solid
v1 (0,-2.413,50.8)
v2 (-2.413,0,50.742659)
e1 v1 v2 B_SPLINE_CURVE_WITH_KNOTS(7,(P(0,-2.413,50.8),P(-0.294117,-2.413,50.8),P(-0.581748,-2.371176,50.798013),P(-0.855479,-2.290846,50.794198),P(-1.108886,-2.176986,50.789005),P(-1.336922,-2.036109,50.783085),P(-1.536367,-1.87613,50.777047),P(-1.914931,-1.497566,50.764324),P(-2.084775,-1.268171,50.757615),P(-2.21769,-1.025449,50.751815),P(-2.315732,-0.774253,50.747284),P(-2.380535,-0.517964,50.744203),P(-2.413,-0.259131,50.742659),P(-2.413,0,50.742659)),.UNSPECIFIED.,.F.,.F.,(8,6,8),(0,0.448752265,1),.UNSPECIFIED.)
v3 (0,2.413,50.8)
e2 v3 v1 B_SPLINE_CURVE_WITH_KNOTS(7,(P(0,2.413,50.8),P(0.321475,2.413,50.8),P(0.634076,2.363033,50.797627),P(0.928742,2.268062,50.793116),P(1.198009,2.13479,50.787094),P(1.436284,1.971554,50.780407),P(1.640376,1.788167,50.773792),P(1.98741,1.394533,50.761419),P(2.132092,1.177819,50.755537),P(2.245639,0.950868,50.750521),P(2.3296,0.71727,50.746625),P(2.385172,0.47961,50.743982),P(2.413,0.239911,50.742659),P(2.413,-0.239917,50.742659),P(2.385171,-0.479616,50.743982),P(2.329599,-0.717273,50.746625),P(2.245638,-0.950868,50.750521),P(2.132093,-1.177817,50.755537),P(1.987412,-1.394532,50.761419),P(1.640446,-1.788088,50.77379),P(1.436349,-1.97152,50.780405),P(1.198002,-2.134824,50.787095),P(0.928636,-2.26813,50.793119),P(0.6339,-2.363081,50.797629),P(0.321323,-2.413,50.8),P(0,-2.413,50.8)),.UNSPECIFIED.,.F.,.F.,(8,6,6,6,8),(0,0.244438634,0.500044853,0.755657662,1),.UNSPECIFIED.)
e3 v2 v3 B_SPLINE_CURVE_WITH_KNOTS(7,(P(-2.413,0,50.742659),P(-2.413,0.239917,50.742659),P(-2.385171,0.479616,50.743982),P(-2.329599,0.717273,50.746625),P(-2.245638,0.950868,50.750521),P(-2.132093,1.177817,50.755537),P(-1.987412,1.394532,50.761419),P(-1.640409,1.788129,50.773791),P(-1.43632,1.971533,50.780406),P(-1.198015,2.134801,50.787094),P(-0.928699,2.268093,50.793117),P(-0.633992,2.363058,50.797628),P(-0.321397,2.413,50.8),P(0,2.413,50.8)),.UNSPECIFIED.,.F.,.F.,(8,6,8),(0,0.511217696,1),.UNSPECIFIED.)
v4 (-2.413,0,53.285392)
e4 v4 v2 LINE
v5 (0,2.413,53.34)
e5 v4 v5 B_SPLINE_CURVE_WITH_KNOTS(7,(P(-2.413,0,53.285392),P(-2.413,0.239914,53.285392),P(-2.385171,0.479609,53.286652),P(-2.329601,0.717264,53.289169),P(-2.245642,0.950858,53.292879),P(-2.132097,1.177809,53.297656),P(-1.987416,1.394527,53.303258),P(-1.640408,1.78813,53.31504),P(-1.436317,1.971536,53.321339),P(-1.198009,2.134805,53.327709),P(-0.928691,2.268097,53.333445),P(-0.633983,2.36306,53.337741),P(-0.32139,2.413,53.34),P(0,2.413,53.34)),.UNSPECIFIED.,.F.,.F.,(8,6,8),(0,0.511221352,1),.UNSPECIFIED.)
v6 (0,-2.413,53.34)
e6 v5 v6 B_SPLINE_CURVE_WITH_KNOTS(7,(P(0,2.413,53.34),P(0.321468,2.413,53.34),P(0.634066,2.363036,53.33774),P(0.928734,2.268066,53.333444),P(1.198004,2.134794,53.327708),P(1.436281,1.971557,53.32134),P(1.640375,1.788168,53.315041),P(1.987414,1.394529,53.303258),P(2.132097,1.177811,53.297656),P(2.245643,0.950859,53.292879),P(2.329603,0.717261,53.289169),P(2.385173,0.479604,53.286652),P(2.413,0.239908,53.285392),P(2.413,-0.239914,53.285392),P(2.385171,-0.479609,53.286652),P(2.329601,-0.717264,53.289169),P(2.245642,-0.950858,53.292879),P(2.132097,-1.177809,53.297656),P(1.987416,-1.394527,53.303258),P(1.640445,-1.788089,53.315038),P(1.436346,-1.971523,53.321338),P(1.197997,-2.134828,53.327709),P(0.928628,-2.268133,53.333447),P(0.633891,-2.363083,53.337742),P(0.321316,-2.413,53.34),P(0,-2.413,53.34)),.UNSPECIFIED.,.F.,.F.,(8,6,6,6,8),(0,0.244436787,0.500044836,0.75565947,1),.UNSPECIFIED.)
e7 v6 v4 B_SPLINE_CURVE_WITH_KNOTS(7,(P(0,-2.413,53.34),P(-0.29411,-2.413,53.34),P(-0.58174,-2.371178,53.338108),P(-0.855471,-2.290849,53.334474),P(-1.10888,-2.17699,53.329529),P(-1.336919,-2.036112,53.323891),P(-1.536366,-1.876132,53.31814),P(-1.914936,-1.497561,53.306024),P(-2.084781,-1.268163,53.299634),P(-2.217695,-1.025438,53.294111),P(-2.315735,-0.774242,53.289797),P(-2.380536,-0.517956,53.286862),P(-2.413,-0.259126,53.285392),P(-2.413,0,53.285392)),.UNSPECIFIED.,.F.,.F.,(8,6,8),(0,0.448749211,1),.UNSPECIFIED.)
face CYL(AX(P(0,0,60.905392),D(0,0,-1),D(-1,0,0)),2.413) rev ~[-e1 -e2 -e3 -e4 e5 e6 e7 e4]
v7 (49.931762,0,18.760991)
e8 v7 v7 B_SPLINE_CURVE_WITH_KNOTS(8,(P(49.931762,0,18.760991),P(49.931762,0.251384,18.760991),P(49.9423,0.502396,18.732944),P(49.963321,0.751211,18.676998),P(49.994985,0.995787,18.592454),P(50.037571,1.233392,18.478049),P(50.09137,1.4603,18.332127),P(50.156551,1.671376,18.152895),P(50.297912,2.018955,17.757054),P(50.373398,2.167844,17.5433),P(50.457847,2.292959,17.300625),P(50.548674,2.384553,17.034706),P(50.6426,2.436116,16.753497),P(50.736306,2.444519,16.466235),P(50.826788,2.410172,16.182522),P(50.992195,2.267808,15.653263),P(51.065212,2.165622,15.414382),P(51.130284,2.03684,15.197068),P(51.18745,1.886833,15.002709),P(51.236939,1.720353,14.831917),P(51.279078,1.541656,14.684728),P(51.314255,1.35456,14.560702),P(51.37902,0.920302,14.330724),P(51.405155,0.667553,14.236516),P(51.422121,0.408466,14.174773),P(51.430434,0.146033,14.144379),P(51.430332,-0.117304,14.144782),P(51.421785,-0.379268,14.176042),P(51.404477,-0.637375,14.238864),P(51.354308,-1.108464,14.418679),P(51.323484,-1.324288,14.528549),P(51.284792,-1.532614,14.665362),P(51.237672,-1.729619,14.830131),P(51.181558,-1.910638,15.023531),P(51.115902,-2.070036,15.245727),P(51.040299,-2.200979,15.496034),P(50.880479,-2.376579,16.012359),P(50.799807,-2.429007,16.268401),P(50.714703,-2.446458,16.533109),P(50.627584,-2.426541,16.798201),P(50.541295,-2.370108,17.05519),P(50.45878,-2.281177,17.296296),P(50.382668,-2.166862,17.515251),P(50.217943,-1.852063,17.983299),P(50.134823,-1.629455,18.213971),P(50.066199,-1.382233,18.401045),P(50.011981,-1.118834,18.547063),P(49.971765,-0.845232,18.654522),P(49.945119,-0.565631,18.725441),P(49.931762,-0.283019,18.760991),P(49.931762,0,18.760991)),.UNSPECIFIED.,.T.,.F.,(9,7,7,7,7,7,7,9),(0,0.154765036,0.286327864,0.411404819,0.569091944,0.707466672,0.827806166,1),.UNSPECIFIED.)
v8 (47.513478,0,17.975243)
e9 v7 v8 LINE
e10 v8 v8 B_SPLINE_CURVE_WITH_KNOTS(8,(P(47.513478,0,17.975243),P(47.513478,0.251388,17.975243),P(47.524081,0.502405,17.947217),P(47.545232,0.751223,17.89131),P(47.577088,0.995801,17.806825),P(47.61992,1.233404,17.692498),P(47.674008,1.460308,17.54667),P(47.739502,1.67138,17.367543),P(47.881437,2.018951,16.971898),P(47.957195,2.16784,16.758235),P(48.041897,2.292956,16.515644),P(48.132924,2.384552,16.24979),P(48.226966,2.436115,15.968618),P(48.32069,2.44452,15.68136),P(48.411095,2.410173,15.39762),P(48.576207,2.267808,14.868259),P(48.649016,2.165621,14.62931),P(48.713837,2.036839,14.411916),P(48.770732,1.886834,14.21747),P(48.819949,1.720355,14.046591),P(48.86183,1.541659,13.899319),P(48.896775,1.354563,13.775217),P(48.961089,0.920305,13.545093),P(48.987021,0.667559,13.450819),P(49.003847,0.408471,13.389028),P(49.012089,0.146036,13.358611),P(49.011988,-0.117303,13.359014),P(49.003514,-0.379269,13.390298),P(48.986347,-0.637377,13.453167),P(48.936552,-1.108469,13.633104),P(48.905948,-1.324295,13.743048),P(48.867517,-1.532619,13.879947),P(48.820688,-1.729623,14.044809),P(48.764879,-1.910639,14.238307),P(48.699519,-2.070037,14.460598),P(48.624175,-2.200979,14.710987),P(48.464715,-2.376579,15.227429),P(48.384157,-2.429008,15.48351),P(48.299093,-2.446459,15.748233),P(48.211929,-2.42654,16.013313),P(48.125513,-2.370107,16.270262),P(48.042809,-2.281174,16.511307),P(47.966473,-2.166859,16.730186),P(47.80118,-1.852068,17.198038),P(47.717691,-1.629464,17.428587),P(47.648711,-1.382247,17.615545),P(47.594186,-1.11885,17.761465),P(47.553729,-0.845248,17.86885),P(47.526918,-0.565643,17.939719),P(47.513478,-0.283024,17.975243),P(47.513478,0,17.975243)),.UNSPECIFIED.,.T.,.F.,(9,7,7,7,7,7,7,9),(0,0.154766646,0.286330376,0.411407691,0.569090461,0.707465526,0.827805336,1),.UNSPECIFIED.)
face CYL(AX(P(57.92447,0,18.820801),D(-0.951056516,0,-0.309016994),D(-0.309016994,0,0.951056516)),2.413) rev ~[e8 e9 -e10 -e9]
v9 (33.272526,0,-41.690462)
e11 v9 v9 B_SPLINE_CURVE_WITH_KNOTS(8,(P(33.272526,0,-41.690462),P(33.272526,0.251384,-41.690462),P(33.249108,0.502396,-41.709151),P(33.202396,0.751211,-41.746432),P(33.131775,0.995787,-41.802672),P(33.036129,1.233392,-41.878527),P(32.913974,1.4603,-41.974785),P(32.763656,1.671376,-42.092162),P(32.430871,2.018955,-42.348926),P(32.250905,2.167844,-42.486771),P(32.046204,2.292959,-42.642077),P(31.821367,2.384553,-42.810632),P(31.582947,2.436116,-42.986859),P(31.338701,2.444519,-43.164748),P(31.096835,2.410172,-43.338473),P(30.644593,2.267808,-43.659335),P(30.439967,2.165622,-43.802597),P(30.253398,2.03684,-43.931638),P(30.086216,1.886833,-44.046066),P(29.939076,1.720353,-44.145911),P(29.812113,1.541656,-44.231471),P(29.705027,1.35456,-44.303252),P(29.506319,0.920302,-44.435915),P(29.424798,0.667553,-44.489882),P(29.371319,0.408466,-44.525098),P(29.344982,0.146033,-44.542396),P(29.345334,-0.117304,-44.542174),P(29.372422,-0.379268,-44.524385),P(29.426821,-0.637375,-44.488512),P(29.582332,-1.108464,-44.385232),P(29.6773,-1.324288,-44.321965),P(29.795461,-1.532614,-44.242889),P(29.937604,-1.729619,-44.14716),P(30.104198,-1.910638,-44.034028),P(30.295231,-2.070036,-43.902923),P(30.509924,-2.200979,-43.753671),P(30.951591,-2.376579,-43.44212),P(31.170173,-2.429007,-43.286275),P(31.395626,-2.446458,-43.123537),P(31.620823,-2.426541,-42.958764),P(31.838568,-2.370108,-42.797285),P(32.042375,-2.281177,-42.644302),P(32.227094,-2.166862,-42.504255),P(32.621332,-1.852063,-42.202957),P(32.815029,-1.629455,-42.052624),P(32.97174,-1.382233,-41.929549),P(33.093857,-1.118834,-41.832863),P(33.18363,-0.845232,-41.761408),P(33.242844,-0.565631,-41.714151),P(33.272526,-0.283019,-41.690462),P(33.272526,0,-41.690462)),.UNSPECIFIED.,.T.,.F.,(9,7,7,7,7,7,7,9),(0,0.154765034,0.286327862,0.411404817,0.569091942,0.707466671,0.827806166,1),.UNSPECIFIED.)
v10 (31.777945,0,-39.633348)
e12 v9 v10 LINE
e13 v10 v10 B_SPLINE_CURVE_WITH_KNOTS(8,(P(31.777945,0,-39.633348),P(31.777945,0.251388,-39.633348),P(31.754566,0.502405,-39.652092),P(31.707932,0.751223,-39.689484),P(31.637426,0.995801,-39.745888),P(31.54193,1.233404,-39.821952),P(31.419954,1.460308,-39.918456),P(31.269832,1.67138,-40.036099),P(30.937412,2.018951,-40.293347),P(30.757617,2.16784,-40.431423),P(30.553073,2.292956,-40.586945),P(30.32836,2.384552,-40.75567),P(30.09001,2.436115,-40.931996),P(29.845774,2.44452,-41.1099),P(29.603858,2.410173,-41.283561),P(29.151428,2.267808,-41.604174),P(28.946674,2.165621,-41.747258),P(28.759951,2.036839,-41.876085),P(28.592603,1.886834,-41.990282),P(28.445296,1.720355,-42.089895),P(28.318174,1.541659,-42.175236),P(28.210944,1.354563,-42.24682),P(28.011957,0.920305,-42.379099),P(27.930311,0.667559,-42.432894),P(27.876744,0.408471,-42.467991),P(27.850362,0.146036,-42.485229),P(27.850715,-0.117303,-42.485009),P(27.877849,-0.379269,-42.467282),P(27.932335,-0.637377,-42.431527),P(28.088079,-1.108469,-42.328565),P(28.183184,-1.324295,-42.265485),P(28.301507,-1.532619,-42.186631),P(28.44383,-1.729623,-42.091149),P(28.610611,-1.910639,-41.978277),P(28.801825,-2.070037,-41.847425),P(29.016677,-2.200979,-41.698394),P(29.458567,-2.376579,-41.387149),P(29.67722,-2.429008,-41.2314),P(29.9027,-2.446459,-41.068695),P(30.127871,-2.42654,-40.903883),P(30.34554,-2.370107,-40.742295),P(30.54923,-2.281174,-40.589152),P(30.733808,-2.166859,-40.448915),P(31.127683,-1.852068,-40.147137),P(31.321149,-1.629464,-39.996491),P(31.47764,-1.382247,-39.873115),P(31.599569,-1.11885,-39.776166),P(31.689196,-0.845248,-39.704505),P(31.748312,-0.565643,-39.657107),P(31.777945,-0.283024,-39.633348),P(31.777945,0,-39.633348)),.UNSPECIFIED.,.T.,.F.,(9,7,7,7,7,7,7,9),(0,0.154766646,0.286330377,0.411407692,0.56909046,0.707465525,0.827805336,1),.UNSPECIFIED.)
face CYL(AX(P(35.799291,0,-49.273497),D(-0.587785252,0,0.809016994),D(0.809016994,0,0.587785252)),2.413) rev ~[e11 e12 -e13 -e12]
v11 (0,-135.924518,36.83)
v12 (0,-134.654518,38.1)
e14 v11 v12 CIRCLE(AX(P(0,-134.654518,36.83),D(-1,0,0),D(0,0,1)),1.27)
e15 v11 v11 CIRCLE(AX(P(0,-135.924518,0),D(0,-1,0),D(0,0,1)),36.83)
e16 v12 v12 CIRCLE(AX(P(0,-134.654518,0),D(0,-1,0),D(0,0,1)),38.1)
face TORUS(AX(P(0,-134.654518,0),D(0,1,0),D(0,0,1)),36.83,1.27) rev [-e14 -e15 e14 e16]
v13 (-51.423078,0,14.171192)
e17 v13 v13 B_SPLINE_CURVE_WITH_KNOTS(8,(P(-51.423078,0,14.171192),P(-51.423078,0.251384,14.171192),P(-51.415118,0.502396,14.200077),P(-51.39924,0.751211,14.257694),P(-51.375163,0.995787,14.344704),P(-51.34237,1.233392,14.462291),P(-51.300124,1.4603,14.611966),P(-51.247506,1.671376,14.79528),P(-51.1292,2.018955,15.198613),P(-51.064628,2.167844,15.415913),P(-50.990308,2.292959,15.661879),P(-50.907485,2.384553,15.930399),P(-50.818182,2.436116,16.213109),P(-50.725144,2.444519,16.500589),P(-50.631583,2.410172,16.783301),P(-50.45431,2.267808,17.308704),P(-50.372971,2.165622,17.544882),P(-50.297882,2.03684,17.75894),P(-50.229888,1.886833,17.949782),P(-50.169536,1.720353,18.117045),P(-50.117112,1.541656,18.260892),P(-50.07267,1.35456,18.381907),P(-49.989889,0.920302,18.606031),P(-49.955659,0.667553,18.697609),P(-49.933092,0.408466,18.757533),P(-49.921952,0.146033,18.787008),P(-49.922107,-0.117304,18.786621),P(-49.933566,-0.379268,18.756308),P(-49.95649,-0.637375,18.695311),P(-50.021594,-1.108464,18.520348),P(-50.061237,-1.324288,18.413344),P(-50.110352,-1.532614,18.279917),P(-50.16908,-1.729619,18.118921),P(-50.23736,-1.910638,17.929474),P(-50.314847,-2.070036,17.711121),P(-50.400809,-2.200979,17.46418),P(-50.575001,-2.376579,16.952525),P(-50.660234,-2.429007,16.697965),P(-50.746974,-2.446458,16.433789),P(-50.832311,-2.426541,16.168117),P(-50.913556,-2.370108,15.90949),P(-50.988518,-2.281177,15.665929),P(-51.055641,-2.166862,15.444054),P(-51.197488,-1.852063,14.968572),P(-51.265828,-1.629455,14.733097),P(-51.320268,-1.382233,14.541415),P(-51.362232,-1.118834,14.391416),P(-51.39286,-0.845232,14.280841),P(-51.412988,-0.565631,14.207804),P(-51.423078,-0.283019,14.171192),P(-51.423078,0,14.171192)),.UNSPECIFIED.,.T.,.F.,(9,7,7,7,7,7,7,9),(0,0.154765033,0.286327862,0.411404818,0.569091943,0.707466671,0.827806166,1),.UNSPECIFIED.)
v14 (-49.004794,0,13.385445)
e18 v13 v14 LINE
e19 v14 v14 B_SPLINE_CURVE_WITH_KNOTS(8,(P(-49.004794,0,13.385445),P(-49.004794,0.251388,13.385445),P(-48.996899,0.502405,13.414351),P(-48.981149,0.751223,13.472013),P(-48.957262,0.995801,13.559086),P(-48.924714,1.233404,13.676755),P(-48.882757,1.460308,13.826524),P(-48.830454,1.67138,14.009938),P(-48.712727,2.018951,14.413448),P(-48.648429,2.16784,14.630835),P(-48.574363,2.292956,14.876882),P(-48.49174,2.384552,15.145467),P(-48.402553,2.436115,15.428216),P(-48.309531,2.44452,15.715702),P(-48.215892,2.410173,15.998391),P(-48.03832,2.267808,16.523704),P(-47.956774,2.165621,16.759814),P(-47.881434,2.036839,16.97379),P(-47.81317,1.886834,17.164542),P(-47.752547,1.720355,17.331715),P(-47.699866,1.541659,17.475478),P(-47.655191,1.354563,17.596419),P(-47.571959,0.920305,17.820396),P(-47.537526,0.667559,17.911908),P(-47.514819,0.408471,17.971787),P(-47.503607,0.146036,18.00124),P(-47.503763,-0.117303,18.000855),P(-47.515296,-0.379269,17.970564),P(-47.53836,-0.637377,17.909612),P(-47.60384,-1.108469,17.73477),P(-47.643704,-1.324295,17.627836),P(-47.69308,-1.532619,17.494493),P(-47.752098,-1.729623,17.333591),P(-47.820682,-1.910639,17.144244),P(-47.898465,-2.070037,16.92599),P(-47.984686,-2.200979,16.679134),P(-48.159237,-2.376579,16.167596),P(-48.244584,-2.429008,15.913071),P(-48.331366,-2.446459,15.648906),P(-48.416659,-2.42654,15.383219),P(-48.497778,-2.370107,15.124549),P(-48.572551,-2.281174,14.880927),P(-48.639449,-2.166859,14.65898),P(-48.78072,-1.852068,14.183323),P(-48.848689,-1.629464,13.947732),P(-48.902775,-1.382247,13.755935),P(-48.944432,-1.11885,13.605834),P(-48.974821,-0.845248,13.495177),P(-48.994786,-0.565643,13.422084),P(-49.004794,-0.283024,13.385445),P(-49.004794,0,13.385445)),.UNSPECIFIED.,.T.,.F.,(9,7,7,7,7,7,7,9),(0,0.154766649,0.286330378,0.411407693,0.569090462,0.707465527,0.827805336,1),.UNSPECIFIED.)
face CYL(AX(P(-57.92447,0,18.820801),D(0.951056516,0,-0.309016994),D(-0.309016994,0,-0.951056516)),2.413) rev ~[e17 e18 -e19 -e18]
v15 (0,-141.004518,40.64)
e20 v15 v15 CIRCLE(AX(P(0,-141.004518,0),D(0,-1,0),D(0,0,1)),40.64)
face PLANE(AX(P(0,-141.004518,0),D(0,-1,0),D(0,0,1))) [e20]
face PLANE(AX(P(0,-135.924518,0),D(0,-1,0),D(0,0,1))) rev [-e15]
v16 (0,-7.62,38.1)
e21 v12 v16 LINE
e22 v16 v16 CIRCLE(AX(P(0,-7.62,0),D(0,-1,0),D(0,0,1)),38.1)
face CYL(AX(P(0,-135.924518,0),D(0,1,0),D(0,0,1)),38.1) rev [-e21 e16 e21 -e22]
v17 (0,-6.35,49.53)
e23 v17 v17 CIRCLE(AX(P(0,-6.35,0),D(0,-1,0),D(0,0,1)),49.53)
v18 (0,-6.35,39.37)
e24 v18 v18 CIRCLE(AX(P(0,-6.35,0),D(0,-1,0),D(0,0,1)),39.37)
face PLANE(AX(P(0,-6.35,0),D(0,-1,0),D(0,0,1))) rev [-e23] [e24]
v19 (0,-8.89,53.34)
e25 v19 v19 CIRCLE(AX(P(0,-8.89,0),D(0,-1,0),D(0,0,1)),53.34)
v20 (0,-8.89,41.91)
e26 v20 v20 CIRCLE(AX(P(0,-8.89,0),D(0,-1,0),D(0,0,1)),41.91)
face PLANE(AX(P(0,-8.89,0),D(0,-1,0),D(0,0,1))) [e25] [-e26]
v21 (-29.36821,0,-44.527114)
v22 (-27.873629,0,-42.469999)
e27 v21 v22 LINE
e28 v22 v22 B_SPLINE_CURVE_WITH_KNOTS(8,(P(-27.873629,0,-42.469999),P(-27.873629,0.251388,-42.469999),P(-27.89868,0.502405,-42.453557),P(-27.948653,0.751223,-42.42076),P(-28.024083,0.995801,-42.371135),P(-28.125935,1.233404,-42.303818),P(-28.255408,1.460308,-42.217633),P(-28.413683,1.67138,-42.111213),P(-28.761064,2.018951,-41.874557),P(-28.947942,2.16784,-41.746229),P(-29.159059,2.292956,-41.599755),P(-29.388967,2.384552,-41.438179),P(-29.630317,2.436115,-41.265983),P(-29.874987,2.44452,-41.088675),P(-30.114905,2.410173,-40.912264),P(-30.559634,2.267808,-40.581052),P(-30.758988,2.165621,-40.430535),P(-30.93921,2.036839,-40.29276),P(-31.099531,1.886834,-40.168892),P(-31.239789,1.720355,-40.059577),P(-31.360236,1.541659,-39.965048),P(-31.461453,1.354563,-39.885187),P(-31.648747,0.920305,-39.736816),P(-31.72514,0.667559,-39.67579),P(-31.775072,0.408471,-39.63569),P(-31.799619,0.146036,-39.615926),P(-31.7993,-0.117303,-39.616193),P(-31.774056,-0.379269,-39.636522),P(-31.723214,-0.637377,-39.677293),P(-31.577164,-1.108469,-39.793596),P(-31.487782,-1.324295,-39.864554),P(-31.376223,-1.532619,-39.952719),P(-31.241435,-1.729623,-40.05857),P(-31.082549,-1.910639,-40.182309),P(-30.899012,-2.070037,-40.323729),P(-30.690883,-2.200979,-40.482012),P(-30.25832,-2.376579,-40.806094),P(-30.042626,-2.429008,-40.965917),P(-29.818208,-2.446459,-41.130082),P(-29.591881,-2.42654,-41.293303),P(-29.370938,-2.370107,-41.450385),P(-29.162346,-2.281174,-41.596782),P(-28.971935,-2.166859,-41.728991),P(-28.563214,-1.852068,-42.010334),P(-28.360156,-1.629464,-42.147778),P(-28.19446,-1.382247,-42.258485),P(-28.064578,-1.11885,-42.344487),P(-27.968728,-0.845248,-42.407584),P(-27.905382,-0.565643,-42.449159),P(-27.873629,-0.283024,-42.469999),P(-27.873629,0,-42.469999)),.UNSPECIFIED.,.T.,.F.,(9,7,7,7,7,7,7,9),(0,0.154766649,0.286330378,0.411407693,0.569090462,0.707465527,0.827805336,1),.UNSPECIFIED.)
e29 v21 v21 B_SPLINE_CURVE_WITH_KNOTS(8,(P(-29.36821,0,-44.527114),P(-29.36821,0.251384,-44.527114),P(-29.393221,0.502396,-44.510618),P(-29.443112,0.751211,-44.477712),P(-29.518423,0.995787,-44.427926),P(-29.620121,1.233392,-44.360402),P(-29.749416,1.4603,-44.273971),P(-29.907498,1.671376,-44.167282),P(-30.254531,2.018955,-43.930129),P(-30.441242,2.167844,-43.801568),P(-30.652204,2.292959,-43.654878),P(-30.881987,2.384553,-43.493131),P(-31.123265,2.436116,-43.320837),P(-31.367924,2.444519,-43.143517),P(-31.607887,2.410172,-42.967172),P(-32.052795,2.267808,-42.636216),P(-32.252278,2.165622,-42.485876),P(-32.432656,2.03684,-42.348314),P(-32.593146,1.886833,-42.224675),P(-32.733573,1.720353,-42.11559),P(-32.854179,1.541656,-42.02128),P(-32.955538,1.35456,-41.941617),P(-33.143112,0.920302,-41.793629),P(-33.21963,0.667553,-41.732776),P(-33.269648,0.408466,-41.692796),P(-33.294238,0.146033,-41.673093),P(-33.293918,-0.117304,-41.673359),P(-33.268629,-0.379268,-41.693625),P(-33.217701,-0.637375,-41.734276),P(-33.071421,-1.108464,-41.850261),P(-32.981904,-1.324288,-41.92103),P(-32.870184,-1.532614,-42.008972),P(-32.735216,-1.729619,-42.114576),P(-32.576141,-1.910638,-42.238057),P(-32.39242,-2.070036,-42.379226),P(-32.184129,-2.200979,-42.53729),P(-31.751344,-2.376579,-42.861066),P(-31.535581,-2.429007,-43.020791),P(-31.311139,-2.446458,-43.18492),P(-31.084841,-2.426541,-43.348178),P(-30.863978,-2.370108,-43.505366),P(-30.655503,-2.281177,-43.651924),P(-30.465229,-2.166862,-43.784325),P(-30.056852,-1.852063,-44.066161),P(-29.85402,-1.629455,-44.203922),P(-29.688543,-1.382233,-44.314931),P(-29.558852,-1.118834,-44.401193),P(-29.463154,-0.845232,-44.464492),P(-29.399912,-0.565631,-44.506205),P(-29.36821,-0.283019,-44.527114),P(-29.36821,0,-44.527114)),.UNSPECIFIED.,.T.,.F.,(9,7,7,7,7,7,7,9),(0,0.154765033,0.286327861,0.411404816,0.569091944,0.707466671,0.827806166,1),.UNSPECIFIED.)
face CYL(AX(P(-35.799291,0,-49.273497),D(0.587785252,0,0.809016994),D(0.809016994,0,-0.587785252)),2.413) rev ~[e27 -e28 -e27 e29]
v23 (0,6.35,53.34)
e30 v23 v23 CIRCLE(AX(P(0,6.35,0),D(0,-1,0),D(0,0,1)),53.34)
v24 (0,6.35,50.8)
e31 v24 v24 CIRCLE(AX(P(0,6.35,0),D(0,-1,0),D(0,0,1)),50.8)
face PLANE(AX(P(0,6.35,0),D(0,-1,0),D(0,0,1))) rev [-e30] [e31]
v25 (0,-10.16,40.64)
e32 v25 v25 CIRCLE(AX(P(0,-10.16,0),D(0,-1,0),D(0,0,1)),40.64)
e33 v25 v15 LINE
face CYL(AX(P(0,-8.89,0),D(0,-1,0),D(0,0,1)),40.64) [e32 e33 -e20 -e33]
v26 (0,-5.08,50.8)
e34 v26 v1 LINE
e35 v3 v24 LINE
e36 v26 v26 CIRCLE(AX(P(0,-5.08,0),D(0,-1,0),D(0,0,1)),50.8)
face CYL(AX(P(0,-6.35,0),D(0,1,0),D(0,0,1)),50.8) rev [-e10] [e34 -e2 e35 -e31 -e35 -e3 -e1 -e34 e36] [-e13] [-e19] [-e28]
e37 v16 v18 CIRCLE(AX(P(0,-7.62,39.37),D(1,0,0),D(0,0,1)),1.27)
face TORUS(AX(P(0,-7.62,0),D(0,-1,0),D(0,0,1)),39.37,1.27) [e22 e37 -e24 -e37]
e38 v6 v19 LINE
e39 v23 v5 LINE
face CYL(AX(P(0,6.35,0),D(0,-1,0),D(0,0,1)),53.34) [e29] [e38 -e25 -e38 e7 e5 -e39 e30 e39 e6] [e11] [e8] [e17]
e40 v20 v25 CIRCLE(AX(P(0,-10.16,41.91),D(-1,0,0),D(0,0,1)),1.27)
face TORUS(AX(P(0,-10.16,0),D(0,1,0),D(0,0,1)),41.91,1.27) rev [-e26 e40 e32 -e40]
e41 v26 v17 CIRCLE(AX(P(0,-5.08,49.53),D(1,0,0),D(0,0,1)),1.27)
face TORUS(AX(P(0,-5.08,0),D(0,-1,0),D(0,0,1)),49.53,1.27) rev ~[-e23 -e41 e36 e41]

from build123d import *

# Parameters (mm, degrees)
F2_R            = 1.27
F5_D            = 4.826
F5_DEPTH        = 7.62
F5_START        = 0.0546078
F5_TIP          = 1.4498766737
F5_COPIES_COUNT = 5


# Not quite as in the source:
# - a pattern or mirror of a feature is missing from the dataset's text; its kind, count and spacing are read off the source's solid


with BuildPart() as f1:
    # F0 (on Right) → F1 (revolve)
    with BuildSketch(Plane.YZ):
        Polygon((-6.35, 50.8), (6.35, 50.8), (6.35, 53.34), (-8.89, 53.34), (-8.89, 40.64), (-135.9245181084, 40.64), (-141.0045181084, 40.64), (-141.0045181084, 0), (-135.9245181084, 0), (-135.9245181084, 38.1), (-6.35, 38.1), align=None)
    revolve(axis=Axis((0, -59.97428298, 0), (0, -1, 0)))

    # F2
    f2_edges = [f1.edges().sort_by_distance(p)[0] for p in [
        (0, -6.35, -38.1),
        (0, -6.35, -50.8),
        (0, -8.89, -40.64),
        (0, -135.924518, -38.1),
    ]]
    fillet(f2_edges, radius=F2_R)

    # F5
    # its depths count from where the whole tool has entered the part; down to there all is cleared
    with Locations(Plane.XY.offset(53.34).offset(-F5_START)):
        with Locations((0, 0)):
            f5 = Hole(F5_D / 2, depth=F5_DEPTH)
            with Locations((0, 0, -(F5_DEPTH + F5_TIP / 2))):  # 118° drill point
                Cone(0, F5_D / 2, F5_TIP, mode=Mode.SUBTRACT)

    # F5_copies: F5 ×5 about axis
    f5_copies_axis = Axis((0, 0, 0), (0, 1, 0))
    for i in range(1, F5_COPIES_COUNT):
        add(f5.rotate(f5_copies_axis, i * 360 / F5_COPIES_COUNT), mode=Mode.SUBTRACT)


solid = f1.part
